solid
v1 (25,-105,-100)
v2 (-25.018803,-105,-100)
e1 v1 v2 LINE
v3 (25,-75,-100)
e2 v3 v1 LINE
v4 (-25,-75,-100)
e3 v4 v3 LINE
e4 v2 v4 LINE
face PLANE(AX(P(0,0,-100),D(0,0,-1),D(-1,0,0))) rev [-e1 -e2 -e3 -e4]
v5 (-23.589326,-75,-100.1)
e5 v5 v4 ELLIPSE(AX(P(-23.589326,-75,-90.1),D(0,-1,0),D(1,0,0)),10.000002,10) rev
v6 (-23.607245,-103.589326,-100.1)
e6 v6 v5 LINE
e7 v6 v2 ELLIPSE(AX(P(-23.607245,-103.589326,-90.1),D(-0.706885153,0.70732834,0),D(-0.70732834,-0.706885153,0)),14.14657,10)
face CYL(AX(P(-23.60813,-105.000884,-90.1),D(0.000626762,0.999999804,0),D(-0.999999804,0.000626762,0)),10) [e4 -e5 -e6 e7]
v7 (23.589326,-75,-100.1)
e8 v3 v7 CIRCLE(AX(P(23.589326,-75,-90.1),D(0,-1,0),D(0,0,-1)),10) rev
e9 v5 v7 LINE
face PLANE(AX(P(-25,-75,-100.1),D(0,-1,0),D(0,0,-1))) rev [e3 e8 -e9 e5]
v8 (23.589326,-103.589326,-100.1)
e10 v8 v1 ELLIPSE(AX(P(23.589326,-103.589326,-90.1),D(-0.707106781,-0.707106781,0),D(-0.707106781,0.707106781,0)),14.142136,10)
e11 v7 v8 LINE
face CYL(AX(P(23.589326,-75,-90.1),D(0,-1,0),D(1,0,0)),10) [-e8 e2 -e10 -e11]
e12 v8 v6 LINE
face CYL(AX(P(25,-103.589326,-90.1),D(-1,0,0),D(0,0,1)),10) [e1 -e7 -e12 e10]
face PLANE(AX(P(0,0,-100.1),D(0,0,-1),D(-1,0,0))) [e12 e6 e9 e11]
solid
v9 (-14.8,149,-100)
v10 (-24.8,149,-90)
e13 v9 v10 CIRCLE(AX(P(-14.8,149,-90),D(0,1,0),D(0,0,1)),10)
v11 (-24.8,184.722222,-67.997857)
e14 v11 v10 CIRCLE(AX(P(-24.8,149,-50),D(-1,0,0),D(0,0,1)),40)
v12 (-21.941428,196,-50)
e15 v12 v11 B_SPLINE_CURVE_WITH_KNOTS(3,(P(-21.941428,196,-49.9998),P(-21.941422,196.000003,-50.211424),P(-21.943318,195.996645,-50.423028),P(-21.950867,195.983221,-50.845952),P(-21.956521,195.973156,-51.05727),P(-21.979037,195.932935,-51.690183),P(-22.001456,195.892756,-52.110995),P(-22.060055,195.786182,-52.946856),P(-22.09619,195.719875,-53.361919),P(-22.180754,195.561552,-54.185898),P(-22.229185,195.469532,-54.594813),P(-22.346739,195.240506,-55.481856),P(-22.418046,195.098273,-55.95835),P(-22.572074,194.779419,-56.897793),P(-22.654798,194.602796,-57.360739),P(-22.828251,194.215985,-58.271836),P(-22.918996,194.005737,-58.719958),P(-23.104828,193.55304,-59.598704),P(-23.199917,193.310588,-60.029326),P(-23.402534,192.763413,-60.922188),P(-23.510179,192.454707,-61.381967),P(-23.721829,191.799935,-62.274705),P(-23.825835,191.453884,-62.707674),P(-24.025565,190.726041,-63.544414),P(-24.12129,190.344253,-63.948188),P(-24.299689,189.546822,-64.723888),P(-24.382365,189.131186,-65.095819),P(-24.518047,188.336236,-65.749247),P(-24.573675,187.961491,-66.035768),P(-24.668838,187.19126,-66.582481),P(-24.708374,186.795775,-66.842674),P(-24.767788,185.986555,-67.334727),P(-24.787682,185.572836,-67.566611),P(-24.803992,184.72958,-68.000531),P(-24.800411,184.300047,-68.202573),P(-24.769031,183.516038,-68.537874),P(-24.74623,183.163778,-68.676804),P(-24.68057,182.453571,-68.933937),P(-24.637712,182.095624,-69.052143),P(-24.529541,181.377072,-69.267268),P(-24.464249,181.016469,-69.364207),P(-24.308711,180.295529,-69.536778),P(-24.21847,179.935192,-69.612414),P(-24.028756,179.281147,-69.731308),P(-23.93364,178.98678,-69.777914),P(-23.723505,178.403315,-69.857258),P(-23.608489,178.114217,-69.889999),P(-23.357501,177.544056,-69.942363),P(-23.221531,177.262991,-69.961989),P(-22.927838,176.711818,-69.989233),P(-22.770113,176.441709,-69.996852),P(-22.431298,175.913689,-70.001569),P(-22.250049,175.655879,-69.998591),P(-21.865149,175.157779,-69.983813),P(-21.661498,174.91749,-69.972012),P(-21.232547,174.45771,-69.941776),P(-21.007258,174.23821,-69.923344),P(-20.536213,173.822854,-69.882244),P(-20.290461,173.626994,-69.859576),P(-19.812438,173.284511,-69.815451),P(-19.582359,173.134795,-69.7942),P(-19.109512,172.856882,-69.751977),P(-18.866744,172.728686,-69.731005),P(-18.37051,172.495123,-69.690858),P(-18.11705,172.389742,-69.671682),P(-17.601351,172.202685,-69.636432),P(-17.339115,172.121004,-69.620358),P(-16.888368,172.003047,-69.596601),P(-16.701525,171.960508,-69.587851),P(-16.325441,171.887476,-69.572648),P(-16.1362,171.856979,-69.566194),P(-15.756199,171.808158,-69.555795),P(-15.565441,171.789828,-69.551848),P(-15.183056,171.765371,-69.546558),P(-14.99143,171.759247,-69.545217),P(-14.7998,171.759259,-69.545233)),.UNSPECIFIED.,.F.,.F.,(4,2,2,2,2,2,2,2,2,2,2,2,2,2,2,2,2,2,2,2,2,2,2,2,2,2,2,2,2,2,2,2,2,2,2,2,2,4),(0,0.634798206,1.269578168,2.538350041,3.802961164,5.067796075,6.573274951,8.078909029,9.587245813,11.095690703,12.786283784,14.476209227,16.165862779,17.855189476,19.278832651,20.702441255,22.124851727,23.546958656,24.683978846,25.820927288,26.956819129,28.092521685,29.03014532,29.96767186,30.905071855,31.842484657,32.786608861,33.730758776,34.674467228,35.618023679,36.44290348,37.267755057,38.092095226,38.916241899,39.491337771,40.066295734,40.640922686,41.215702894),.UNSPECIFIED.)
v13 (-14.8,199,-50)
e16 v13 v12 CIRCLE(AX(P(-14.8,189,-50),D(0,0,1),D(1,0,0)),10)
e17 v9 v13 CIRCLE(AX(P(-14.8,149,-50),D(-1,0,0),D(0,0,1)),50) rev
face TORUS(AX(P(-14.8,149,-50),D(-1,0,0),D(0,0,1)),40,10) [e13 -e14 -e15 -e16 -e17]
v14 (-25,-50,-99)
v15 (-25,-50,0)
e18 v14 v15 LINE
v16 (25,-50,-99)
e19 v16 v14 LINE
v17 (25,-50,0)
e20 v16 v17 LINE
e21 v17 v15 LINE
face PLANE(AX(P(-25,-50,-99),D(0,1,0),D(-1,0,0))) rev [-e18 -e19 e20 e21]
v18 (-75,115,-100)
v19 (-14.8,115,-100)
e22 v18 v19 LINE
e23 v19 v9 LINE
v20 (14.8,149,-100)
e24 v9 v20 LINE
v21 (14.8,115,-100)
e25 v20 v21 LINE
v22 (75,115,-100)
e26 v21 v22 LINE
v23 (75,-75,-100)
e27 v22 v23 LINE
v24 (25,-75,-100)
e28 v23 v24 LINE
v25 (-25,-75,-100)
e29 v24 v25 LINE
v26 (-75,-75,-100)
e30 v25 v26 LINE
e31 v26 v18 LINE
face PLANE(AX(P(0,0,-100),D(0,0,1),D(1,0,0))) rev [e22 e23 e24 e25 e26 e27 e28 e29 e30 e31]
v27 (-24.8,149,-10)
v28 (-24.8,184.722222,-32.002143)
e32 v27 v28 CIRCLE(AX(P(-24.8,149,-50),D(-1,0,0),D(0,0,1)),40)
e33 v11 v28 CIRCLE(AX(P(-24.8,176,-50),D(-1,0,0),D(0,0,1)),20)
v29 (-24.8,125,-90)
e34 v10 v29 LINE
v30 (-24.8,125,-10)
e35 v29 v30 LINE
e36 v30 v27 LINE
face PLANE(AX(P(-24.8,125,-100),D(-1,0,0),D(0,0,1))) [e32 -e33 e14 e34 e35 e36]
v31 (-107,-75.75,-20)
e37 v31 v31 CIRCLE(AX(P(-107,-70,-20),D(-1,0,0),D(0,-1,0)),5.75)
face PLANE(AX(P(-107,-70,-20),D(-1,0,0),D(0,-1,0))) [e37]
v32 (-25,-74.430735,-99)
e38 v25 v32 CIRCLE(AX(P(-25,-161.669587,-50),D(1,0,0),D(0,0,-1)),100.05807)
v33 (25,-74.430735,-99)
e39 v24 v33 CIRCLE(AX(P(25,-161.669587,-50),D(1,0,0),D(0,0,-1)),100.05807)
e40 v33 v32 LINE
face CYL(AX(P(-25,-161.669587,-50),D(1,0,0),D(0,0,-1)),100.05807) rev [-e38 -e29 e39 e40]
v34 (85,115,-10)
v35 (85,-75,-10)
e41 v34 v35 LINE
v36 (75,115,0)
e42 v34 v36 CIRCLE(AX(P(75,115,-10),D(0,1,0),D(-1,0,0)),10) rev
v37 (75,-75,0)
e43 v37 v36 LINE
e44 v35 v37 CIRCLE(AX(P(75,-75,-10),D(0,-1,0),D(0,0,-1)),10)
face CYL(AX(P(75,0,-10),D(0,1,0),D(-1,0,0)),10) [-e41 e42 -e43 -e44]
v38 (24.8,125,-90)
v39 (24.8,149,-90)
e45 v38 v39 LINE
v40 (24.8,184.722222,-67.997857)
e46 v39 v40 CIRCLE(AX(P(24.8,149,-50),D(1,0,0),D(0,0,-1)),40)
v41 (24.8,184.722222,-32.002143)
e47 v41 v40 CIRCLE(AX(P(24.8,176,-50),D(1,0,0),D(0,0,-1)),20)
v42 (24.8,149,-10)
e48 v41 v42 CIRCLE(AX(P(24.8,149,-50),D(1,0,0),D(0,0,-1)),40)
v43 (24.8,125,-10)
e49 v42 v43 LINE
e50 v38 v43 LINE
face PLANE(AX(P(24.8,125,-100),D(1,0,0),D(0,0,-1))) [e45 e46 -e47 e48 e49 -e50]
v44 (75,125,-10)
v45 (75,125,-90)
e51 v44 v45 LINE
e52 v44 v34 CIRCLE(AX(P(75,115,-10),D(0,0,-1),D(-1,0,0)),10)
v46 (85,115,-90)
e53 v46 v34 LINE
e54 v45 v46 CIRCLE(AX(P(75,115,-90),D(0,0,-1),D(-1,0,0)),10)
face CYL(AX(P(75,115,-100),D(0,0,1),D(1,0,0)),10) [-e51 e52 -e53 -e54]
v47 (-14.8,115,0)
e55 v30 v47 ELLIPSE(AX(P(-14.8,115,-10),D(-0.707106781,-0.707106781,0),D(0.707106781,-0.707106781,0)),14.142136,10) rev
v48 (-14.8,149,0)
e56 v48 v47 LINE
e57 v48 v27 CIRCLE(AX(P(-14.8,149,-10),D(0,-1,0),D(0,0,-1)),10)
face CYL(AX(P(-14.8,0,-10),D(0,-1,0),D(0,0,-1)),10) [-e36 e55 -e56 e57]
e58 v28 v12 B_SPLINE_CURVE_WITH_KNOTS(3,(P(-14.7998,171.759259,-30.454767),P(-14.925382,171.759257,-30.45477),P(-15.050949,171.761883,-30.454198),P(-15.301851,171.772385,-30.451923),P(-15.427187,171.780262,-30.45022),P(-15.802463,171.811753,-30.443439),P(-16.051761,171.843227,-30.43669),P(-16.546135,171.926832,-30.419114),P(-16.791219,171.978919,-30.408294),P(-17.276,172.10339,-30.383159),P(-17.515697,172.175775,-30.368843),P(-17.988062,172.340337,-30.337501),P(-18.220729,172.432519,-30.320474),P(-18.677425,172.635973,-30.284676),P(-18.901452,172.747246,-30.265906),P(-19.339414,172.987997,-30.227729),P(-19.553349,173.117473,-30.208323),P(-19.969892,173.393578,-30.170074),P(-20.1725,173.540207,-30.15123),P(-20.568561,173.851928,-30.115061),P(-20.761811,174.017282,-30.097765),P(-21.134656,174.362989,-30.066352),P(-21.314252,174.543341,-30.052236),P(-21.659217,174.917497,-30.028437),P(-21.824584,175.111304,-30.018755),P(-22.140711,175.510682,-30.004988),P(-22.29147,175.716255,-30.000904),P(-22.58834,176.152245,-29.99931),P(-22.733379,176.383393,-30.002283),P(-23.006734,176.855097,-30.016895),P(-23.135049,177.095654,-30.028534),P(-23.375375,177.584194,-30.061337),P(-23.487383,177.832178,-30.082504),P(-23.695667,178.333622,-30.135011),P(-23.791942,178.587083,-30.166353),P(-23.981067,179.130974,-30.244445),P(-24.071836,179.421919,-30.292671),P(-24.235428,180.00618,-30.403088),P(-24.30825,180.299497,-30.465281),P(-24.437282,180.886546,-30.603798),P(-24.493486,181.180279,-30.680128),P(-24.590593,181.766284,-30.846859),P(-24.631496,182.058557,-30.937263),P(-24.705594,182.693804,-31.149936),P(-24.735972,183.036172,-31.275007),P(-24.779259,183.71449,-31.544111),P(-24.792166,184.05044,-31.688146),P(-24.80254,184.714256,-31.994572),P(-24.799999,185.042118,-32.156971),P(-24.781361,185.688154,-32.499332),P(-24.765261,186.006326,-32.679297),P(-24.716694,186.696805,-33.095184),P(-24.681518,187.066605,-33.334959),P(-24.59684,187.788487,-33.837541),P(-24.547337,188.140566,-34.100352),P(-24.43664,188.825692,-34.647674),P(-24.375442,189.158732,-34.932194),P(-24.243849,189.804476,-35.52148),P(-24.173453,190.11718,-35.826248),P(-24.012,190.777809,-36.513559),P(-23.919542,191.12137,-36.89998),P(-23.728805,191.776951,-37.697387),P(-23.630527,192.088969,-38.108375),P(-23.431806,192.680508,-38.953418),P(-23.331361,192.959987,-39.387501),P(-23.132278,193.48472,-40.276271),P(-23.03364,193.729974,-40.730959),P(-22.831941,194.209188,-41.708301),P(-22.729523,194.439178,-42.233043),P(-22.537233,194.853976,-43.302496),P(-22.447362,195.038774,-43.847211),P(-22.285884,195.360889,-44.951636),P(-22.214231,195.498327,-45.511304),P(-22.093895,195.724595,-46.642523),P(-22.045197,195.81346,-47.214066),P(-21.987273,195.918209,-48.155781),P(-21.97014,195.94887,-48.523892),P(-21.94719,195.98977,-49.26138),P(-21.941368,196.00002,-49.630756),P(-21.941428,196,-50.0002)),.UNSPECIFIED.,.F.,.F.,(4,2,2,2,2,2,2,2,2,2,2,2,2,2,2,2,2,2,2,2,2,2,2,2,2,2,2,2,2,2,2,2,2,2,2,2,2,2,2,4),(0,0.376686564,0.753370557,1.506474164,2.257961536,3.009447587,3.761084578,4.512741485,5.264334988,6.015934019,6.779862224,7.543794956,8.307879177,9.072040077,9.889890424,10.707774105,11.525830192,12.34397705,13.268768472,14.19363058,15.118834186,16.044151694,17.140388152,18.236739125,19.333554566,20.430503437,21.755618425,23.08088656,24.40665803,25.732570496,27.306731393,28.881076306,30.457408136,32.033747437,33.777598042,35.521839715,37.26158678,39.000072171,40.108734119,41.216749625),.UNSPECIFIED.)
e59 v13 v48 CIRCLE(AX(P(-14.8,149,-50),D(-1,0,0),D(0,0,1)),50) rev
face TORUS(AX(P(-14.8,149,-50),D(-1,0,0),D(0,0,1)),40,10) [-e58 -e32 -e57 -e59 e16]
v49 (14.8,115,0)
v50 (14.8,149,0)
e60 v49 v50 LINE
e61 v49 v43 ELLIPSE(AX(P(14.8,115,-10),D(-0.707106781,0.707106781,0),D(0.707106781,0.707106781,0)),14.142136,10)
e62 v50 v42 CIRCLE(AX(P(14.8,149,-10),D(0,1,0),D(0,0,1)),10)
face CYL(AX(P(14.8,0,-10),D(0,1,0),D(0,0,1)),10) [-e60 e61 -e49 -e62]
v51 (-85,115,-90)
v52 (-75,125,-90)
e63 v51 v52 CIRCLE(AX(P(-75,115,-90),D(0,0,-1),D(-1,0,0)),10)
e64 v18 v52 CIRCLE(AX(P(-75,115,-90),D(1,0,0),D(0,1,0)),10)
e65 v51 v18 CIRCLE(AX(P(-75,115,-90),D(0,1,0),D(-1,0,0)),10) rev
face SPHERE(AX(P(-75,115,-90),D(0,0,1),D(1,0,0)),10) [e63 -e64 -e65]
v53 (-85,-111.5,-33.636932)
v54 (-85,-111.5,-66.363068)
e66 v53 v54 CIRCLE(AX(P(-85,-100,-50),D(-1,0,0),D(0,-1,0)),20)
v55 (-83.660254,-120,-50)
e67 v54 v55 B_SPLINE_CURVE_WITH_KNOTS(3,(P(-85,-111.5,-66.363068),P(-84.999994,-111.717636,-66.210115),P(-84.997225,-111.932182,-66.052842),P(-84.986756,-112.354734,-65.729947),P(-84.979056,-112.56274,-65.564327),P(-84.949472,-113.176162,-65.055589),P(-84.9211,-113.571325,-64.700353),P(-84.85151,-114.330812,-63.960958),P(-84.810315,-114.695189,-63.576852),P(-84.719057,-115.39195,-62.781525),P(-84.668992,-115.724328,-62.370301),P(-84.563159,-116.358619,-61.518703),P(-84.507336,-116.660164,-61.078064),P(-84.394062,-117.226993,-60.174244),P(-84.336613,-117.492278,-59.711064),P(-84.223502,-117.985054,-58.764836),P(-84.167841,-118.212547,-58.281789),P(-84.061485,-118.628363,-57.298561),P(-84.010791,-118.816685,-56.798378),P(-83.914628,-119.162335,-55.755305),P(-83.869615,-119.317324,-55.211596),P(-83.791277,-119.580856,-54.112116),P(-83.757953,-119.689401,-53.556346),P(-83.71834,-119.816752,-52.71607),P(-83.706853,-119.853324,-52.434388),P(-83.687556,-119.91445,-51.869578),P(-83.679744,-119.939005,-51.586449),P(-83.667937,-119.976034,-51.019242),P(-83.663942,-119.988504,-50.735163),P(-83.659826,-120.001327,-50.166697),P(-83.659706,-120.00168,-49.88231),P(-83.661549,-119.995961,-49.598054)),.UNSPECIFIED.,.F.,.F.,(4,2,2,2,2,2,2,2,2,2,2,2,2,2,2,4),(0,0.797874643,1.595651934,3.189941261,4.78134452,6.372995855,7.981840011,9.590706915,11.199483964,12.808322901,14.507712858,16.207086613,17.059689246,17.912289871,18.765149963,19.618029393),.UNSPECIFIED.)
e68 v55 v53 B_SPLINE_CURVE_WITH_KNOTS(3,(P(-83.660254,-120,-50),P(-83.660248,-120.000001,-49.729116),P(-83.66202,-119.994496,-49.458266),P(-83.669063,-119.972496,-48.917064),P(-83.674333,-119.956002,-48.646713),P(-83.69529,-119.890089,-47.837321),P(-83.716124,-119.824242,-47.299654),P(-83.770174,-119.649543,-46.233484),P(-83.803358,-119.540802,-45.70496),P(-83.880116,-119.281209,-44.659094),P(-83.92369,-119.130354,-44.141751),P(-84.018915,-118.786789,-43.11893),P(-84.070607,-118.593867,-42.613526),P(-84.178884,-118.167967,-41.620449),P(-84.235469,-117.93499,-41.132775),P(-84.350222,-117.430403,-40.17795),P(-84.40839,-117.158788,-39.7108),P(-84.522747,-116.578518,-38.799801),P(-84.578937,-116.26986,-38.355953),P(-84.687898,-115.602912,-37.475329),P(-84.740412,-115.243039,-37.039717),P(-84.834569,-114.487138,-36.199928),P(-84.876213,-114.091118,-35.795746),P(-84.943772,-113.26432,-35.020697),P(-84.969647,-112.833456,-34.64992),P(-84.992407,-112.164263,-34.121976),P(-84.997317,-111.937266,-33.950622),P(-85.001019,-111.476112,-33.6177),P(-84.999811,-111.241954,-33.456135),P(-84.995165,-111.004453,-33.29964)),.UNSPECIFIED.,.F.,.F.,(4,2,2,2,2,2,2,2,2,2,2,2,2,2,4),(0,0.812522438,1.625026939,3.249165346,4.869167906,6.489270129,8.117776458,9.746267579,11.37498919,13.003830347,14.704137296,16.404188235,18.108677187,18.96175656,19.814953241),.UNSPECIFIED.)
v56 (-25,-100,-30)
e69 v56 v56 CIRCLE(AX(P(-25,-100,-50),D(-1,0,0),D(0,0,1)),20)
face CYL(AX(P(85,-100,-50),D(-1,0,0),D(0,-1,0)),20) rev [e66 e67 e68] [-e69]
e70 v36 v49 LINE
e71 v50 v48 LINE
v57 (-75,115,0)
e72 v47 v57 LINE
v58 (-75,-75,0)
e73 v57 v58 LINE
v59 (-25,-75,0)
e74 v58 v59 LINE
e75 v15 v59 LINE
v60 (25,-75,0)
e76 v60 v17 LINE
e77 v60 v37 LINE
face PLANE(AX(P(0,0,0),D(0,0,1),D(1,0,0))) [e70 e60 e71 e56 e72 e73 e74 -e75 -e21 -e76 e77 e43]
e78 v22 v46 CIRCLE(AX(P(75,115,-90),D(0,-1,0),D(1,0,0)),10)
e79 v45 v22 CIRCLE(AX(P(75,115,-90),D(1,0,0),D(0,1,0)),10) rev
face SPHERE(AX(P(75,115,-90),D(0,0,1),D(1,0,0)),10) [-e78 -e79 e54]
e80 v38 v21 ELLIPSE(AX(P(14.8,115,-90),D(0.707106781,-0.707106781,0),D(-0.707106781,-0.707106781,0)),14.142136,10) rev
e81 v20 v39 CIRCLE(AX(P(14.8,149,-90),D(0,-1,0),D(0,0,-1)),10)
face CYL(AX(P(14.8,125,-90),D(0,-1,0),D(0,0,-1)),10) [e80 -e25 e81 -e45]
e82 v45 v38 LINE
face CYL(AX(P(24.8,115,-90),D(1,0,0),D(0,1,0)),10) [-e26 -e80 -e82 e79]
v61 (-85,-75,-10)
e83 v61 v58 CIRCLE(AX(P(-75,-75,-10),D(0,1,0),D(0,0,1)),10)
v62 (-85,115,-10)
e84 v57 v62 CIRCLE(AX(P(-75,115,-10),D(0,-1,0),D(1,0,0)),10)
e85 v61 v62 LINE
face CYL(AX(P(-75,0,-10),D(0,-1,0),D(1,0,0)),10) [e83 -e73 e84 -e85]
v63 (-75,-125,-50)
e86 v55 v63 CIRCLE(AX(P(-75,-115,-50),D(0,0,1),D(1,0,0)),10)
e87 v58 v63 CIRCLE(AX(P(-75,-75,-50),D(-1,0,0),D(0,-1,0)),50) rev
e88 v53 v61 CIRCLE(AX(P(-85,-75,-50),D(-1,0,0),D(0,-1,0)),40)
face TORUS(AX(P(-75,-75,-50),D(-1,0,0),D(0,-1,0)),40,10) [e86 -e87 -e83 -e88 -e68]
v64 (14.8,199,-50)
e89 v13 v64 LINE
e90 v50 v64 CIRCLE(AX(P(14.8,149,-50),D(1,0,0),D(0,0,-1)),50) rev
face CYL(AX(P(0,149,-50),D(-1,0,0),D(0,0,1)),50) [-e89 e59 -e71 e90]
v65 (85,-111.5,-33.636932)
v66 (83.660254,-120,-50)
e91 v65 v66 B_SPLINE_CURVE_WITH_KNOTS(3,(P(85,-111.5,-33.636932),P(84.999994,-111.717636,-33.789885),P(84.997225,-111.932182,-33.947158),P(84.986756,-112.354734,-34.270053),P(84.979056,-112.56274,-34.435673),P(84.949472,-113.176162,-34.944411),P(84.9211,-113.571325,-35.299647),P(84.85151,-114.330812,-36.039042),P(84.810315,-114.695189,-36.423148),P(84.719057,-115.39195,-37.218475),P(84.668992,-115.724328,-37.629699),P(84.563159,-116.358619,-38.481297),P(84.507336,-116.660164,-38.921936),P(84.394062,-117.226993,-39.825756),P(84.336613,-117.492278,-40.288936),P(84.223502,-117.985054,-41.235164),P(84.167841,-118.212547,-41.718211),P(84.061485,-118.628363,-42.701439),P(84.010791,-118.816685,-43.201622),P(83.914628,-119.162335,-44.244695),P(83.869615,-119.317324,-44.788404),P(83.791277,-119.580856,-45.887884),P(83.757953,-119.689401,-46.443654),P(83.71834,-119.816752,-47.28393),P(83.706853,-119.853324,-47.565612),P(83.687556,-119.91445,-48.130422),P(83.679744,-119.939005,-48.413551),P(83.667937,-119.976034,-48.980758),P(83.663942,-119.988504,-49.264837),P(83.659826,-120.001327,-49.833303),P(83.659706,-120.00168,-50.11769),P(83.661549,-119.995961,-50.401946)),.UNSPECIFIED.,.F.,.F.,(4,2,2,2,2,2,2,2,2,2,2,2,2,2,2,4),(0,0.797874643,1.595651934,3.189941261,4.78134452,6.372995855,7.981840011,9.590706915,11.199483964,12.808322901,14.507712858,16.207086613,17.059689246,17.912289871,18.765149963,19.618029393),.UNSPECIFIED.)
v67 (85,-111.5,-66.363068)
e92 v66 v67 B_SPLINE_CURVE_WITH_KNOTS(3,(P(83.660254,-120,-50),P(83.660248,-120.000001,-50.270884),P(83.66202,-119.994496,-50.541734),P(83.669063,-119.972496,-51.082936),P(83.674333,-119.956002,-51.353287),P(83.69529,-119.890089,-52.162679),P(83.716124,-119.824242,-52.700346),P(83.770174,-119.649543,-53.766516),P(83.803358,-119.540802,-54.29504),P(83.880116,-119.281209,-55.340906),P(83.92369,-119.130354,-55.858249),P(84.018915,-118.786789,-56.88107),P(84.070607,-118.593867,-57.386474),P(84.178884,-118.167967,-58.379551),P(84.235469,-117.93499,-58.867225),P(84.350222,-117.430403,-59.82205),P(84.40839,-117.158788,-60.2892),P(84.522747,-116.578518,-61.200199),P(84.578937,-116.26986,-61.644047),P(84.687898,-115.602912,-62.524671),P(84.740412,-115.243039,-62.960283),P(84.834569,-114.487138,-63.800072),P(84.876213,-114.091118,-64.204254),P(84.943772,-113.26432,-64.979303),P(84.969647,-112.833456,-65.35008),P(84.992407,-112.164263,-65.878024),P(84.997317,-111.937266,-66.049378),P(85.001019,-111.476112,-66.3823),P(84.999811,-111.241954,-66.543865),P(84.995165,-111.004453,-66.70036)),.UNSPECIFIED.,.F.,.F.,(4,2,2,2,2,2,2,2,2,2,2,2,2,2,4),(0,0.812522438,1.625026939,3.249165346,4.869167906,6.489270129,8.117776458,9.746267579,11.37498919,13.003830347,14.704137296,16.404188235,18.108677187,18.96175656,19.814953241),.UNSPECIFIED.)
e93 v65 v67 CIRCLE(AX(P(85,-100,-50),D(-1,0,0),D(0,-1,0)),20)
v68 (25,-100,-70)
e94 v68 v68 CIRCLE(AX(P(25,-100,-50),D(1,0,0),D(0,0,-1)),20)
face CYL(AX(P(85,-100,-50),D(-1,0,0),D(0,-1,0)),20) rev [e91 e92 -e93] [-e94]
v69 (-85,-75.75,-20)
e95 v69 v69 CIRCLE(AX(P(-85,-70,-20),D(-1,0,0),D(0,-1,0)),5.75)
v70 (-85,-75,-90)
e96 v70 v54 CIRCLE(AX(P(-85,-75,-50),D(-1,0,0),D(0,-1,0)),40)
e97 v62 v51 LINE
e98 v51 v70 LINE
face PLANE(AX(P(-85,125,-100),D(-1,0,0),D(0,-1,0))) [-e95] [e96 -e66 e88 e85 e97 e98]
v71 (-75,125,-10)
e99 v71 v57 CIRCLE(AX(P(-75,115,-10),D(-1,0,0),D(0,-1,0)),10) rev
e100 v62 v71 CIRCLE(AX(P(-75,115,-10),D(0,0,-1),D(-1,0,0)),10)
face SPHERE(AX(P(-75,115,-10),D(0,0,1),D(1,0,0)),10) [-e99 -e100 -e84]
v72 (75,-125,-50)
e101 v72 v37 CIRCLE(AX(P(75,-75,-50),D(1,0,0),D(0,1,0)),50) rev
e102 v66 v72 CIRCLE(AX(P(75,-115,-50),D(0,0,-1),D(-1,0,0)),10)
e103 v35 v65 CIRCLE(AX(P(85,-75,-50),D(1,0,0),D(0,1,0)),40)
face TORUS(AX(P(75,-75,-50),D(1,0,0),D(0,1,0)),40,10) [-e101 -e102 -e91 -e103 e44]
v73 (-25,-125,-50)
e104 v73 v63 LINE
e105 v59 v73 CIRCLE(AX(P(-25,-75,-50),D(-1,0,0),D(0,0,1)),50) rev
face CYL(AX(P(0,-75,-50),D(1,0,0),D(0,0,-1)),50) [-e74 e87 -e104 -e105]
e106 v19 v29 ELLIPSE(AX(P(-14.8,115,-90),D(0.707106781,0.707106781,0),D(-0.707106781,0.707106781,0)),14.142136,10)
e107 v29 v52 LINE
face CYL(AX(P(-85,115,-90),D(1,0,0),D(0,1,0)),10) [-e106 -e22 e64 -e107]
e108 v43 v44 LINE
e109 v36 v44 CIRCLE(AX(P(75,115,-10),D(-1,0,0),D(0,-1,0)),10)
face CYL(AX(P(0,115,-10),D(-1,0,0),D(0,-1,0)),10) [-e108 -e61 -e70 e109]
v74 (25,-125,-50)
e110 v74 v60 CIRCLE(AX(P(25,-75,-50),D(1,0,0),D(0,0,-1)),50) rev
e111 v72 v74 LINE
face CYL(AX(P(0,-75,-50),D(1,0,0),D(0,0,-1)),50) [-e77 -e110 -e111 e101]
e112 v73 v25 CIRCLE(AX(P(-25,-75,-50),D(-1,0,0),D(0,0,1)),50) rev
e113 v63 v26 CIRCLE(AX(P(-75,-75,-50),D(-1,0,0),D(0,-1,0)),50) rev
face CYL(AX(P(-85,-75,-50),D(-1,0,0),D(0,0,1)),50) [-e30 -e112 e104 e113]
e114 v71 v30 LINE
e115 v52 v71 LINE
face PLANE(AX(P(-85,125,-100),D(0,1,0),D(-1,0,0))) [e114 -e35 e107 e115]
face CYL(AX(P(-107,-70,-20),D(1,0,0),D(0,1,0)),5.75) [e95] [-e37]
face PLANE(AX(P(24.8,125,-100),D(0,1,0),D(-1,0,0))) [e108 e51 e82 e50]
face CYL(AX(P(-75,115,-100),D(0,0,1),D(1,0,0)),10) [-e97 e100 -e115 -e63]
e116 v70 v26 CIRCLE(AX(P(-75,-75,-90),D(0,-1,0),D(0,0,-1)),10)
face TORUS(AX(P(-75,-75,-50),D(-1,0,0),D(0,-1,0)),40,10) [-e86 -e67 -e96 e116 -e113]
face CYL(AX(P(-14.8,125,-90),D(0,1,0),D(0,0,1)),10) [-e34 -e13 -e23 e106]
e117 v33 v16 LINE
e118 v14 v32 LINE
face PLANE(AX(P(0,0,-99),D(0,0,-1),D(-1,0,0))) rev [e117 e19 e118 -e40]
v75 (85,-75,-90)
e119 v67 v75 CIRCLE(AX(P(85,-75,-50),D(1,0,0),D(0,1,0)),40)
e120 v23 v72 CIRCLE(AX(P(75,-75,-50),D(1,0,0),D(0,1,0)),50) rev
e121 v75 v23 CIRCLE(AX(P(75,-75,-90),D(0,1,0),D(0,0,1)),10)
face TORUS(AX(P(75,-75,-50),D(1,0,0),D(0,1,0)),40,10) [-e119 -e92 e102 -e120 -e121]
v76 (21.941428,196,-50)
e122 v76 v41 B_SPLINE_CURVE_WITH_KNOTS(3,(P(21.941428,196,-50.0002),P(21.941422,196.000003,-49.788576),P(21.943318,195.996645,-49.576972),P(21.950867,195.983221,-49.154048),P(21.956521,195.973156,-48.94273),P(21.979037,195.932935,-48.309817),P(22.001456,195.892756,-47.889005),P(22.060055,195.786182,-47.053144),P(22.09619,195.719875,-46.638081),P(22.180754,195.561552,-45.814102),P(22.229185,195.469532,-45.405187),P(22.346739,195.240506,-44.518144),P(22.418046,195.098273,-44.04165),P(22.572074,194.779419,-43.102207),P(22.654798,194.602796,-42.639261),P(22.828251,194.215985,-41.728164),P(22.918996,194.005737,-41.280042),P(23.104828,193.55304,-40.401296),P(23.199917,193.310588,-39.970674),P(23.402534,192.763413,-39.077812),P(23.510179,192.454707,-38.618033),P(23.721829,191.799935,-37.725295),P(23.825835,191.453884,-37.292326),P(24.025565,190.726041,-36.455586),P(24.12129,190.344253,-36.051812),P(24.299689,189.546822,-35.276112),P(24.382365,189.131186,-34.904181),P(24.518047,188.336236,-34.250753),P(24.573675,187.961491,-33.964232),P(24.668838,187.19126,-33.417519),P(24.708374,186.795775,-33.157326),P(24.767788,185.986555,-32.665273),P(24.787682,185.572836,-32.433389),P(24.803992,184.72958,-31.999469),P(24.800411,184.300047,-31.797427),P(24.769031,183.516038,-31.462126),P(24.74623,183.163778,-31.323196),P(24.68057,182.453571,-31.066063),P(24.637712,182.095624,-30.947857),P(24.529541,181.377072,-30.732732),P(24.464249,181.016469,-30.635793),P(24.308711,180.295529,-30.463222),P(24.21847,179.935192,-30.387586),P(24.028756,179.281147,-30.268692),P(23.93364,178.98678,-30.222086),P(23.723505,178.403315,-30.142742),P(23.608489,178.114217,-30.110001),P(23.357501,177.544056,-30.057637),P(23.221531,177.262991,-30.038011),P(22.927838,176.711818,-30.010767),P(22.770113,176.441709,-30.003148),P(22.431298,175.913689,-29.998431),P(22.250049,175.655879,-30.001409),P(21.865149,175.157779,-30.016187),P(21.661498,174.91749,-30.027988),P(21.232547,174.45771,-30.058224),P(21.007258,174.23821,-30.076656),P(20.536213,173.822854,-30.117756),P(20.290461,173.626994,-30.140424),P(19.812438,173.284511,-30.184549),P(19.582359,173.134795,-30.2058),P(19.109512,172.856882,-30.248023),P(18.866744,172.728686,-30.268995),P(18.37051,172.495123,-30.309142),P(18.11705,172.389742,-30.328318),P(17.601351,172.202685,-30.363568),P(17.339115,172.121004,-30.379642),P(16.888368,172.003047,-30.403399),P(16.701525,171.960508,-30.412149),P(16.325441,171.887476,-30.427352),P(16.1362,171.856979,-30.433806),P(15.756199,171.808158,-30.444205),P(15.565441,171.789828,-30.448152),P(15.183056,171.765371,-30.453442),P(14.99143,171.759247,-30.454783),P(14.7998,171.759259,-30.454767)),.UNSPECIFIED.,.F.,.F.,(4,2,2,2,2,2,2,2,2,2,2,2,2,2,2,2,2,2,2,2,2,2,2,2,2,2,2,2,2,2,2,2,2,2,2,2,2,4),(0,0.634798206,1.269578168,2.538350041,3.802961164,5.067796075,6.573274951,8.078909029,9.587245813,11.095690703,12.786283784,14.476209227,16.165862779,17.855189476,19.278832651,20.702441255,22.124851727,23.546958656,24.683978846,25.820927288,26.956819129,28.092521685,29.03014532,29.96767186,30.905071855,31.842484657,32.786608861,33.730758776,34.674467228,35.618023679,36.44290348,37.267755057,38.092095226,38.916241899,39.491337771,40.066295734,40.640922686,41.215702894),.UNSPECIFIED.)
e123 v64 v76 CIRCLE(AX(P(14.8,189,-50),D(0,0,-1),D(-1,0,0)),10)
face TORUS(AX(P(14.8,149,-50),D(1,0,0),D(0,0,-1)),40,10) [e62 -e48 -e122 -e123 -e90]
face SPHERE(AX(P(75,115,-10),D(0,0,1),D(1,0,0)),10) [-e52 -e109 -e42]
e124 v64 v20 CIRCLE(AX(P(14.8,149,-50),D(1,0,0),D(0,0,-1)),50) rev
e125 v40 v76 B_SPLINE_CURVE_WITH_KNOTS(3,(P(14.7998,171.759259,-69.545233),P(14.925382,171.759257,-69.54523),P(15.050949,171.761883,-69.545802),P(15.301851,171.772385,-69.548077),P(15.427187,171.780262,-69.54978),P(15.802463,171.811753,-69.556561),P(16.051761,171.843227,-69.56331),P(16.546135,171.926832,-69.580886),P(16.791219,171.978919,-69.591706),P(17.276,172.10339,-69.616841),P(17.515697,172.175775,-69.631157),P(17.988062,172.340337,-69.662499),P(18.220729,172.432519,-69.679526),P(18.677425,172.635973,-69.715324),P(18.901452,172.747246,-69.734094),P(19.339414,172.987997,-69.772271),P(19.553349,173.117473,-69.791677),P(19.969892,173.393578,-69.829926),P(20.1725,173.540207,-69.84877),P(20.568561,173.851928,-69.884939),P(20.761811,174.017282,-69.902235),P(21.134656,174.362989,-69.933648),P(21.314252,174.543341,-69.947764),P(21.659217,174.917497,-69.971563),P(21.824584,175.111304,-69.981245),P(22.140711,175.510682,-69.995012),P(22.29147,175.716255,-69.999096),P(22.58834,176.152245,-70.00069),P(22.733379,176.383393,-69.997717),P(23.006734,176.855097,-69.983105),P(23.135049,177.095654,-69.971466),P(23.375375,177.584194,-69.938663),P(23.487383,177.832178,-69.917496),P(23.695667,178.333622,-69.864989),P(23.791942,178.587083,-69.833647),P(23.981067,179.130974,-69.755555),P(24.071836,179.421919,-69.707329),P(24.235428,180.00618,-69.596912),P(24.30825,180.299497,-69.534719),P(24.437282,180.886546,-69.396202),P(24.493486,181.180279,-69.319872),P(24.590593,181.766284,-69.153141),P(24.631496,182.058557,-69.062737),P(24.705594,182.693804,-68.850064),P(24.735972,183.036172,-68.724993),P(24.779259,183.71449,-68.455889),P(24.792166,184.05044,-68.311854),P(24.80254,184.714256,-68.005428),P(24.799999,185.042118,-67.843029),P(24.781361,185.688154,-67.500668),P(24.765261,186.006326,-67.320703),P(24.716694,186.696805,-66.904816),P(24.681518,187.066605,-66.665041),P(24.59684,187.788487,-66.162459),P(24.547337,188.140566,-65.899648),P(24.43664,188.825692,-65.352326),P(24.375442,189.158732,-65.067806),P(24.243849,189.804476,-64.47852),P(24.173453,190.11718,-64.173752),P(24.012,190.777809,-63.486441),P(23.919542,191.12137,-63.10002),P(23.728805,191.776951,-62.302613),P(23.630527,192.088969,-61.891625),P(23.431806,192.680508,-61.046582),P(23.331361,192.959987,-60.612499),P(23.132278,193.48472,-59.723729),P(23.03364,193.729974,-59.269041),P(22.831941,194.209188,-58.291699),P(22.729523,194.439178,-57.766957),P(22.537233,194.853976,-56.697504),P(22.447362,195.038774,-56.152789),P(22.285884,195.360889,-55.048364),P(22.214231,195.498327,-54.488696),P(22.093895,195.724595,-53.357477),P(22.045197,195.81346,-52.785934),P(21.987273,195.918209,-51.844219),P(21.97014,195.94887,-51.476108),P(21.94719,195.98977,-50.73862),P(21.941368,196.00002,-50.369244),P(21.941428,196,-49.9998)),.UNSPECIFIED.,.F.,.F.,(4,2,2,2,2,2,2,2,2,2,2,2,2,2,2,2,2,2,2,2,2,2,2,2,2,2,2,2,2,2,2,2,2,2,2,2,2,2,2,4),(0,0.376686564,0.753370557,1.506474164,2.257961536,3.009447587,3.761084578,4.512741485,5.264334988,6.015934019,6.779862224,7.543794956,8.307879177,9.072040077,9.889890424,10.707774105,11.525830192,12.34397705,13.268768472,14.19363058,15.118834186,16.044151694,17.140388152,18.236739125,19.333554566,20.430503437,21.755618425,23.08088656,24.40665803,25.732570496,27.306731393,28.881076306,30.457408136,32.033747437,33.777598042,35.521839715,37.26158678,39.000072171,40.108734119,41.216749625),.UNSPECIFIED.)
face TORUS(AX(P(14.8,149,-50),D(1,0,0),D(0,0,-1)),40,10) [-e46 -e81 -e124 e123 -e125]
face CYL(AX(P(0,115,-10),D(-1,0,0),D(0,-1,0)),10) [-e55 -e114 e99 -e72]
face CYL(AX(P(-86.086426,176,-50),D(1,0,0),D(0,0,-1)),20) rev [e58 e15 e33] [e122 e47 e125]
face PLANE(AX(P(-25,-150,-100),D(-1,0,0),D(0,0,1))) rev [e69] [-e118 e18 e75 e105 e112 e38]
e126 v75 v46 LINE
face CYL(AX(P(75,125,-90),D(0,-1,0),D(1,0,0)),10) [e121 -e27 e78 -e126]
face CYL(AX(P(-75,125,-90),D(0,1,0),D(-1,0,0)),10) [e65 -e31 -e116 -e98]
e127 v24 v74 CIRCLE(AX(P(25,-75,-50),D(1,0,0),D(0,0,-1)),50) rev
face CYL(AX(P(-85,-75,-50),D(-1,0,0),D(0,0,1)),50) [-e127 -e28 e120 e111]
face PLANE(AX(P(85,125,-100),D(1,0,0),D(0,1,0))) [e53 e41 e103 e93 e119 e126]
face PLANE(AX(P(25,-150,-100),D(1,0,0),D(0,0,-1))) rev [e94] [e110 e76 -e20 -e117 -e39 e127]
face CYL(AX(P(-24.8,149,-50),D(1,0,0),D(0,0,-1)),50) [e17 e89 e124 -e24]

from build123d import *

# Parameters (mm, degrees)
BOSS_EXTRUDE1_DEPTH    = 100
SKETCH2_W              = 50
SKETCH2_H              = 50
CUT_EXTRUDE1_DEPTH     = 239.382046304
FILLET1_R              = 50
CUT_EXTRUDE2_DEPTH     = 25
SKETCH7_R              = 20
CUT_EXTRUDE3_DEPTH     = 281.180299093
FILLET2_R              = 50
CUT_EXTRUDE6_START     = -125
CUT_EXTRUDE6_OUTLINE_W = 50
CUT_EXTRUDE6_OUTLINE_H = 6.698729811
CUT_EXTRUDE6_DEPTH     = 50
CUT_EXTRUDE7_DEPTH     = 25
FILLET3_R              = 10
SKETCH11_W             = 50
SKETCH11_H             = 25
CUT_EXTRUDE8_DEPTH     = 99
BOSS_EXTRUDE7_DEPTH    = 0.1
FILLET4_R              = 10
FILLET5_R              = 10
SKETCH8_R              = 20
CUT_EXTRUDE9_DEPTH     = 249.348646185
SKETCH14_R             = 5.75
BOSS_EXTRUDE8_DEPTH    = 22


with BuildPart() as part:
    # Sketch1 → Boss-Extrude1 (new body)
    with BuildSketch(Plane.XY):
        Polygon((-24.8, 125), (-24.8, 199), (24.8, 199), (24.8, 125), (85, 125), (85, -125), (-85, -125), (-85, 125), align=None)
    extrude(amount=-BOSS_EXTRUDE1_DEPTH)

    # Sketch2 → Cut-Extrude1 (cut, through all)
    with BuildSketch(Plane.XY):
        with Locations((0, -125)):
            Rectangle(SKETCH2_W, SKETCH2_H)
    extrude(amount=-CUT_EXTRUDE1_DEPTH, mode=Mode.SUBTRACT)

    # Fillet1
    fillet1_edges = [part.edges().sort_by_distance(p)[0] for p in [
        (0, 199, -100),
        (0, 199, 0),
    ]]
    fillet(fillet1_edges, radius=FILLET1_R - 0.0001)  # a hair under: the kernel refuses the full size

    # Sketch6 → Cut-Extrude2 (cut, symmetric)
    with BuildSketch(Plane(origin=(0, 0, 0), x_dir=(0, 0, -1), z_dir=(1, 0, 0))):
        with BuildLine():
            Line((100, -100), (0, -100))
            ThreePointArc((0, -100), (50, -50), (100, -100))
        make_face()
    extrude(amount=CUT_EXTRUDE2_DEPTH, both=True, mode=Mode.SUBTRACT)

    # Sketch7 → Cut-Extrude3 (cut, through all)
    with BuildSketch(Plane.ZY.offset(85)):
        with Locations(Location((-50, -100, 0), (0, 0, 270))):
            Circle(SKETCH7_R)
    extrude(amount=-CUT_EXTRUDE3_DEPTH, mode=Mode.SUBTRACT)

    # Fillet2
    fillet2_edges = [part.edges().sort_by_distance(p)[0] for p in [
        (-55, -125, -100),
        (-55, -125, 0),
    ]]
    fillet(fillet2_edges, radius=FILLET2_R - 0.0001)  # a hair under: the kernel refuses the full size

    # Cut-Extrude6: read off the stored shape, not the designer's step
    # Cut-Extrude6 outline → Cut-Extrude6 (cut)
    with BuildSketch(Plane(origin=(0, 0, 0), x_dir=(1, 0, 0), z_dir=(0, 1, 0)).offset(CUT_EXTRUDE6_START)):
        with Locations((0, 96.650635095)):
            Rectangle(CUT_EXTRUDE6_OUTLINE_W, CUT_EXTRUDE6_OUTLINE_H)
        with Locations((0, 3.349364906)):
            Rectangle(CUT_EXTRUDE6_OUTLINE_W, CUT_EXTRUDE6_OUTLINE_H)
    extrude(amount=CUT_EXTRUDE6_DEPTH, mode=Mode.SUBTRACT)

    # Sketch10 → Cut-Extrude7 (cut, symmetric)
    with BuildSketch(Plane(origin=(0, 0, 0), x_dir=(0, 0, -1), z_dir=(1, 0, 0))):
        with BuildLine():
            Line((0, -75), (100, -75))
            ThreePointArc((100, -75), (50, -61.611517322), (0, -75))
        make_face()
    extrude(amount=CUT_EXTRUDE7_DEPTH, both=True, mode=Mode.SUBTRACT)

    # Fillet3
    # the kernel refuses this fillet: 10 mm, written as the material it takes off along each edge
    with BuildSketch(Plane(origin=(24.8, 149.0001, -100), x_dir=(0, 0, 1), z_dir=(0, -1, 0)), Plane(origin=(-24.8, 125, 0), x_dir=(1, 0, 0), z_dir=(0, 1, 0)), Plane(origin=(-24.8, 125, -100), x_dir=(0, 0, 1), z_dir=(0, 1, 0)), Plane(origin=(24.8, 149.0001, 0), x_dir=(-1, 0, 0), z_dir=(0, -1, 0))) as fillet3_piece_1:
        with BuildLine():
            CenterArc((FILLET3_R, FILLET3_R), FILLET3_R, 180, 90)
            Line((0, FILLET3_R), (0, 0))
            Line((0, 0), (FILLET3_R, 0))
        make_face()
    extrude(amount=24.0001, mode=Mode.SUBTRACT)
    with BuildSketch(Plane(origin=(24.8, 125, 0), x_dir=(0, -1, 0), z_dir=(1, 0, 0)), Plane(origin=(-110, 125, -100), x_dir=(0, 0, 1), z_dir=(1, 0, 0)), Plane(origin=(24.8, 125, -100), x_dir=(0, 0, 1), z_dir=(1, 0, 0)), Plane(origin=(-110, 125, 0), x_dir=(0, -1, 0), z_dir=(1, 0, 0))) as fillet3_piece_2:
        with BuildLine():
            CenterArc((FILLET3_R, FILLET3_R), FILLET3_R, 180, 90)
            Line((0, FILLET3_R), (0, 0))
            Line((0, 0), (FILLET3_R, 0))
        make_face()
    extrude(amount=85.2, mode=Mode.SUBTRACT)
    with BuildSketch(Plane(origin=(-85, -75.0001, -100), x_dir=(0, 0, 1), z_dir=(0, 1, 0)), Plane(origin=(85, 150, 0), x_dir=(-1, 0, 0), z_dir=(0, -1, 0)), Plane(origin=(85, 150, -100), x_dir=(0, 0, 1), z_dir=(0, -1, 0)), Plane(origin=(-85, -75.0001, 0), x_dir=(1, 0, 0), z_dir=(0, 1, 0))) as fillet3_piece_3:
        with BuildLine():
            CenterArc((FILLET3_R, FILLET3_R), FILLET3_R, 180, 90)
            Line((0, FILLET3_R), (0, 0))
            Line((0, 0), (FILLET3_R, 0))
        make_face()
    extrude(amount=225.0001, mode=Mode.SUBTRACT)
    with BuildSketch(Plane(origin=(-24.8, 149.0001, -49.9999), x_dir=(0, 1, 0), z_dir=(0, 0, -1))) as fillet3_piece_4:
        with BuildLine():
            CenterArc((49.9999 - FILLET3_R, FILLET3_R), FILLET3_R, 270, 90)
            Line((49.9999 - FILLET3_R, 0), (49.9999, 0))
            Line((49.9999, 0), (49.9999, FILLET3_R))
        make_face()
    revolve(axis=Axis((-24.8, 149.0001, -49.9999), (1, 0, 0)), revolution_arc=90, mode=Mode.SUBTRACT)
    with BuildSketch(Plane(origin=(-24.8, 149.0001, -50.0001), x_dir=(0, 1, 0), z_dir=(0, 0, 1))) as fillet3_piece_5:
        with BuildLine():
            CenterArc((49.9999 - FILLET3_R, -FILLET3_R), FILLET3_R, 0, 90)
            Line((49.9999, -FILLET3_R), (49.9999, 0))
            Line((49.9999, 0), (49.9999 - FILLET3_R, 0))
        make_face()
    revolve(axis=Axis((-24.8, 149.0001, -50.0001), (-1, 0, 0)), revolution_arc=90, mode=Mode.SUBTRACT)
    with BuildSketch(Plane(origin=(24.8, 149.0001, -49.9999), x_dir=(0, 1, 0), z_dir=(0, 0, -1))) as fillet3_piece_6:
        with BuildLine():
            CenterArc((49.9999 - FILLET3_R, -FILLET3_R), FILLET3_R, 0, 90)
            Line((49.9999, -FILLET3_R), (49.9999, 0))
            Line((49.9999, 0), (49.9999 - FILLET3_R, 0))
        make_face()
    revolve(axis=Axis((24.8, 149.0001, -49.9999), (1, 0, 0)), revolution_arc=90, mode=Mode.SUBTRACT)
    with BuildSketch(Plane(origin=(24.8, 149.0001, -50.0001), x_dir=(0, 1, 0), z_dir=(0, 0, 1))) as fillet3_piece_7:
        with BuildLine():
            CenterArc((49.9999 - FILLET3_R, FILLET3_R), FILLET3_R, 270, 90)
            Line((49.9999, FILLET3_R), (49.9999, 0))
            Line((49.9999, 0), (49.9999 - FILLET3_R, 0))
        make_face()
    revolve(axis=Axis((24.8, 149.0001, -50.0001), (-1, 0, 0)), revolution_arc=90, mode=Mode.SUBTRACT)
    with BuildSketch(Plane(origin=(85, -75.0001, -49.9999), x_dir=(0, 0, 1), z_dir=(0, 1, 0))) as fillet3_piece_8:
        with BuildLine():
            CenterArc((49.9999 - FILLET3_R, -FILLET3_R), FILLET3_R, 0, 90)
            Line((49.9999, -FILLET3_R), (49.9999, 0))
            Line((49.9999, 0), (49.9999 - FILLET3_R, 0))
        make_face()
    revolve(axis=Axis((85, -75.0001, -49.9999), (1, 0, 0)), revolution_arc=90, mode=Mode.SUBTRACT)
    with BuildSketch(Plane(origin=(85, -75.0001, -50.0001), x_dir=(0, 0, -1), z_dir=(0, 1, 0))) as fillet3_piece_9:
        with BuildLine():
            CenterArc((49.9999 - FILLET3_R, FILLET3_R), FILLET3_R, 270, 90)
            Line((49.9999, FILLET3_R), (49.9999, 0))
            Line((49.9999, 0), (49.9999 - FILLET3_R, 0))
        make_face()
    revolve(axis=Axis((85, -75.0001, -50.0001), (-1, 0, 0)), revolution_arc=90, mode=Mode.SUBTRACT)
    with BuildSketch(Plane(origin=(-85, -75.0001, -49.9999), x_dir=(0, 0, 1), z_dir=(0, 1, 0))) as fillet3_piece_10:
        with BuildLine():
            CenterArc((49.9999 - FILLET3_R, FILLET3_R), FILLET3_R, 270, 90)
            Line((49.9999, FILLET3_R), (49.9999, 0))
            Line((49.9999, 0), (49.9999 - FILLET3_R, 0))
        make_face()
    revolve(axis=Axis((-85, -75.0001, -49.9999), (1, 0, 0)), revolution_arc=90, mode=Mode.SUBTRACT)
    with BuildSketch(Plane(origin=(-85, -75.0001, -50.0001), x_dir=(0, 0, -1), z_dir=(0, 1, 0))) as fillet3_piece_11:
        with BuildLine():
            CenterArc((49.9999 - FILLET3_R, -FILLET3_R), FILLET3_R, 0, 90)
            Line((49.9999, -FILLET3_R), (49.9999, 0))
            Line((49.9999, 0), (49.9999 - FILLET3_R, 0))
        make_face()
    revolve(axis=Axis((-85, -75.0001, -50.0001), (-1, 0, 0)), revolution_arc=90, mode=Mode.SUBTRACT)
    with BuildSketch(Plane(origin=(-85, -125, -49.9999), x_dir=(0, 1, 0), z_dir=(0, 0, -1)), Plane(origin=(24.8, 199, -49.9999), x_dir=(0, -1, 0), z_dir=(0, 0, -1))) as fillet3_piece_12:
        with BuildLine():
            CenterArc((FILLET3_R, FILLET3_R), FILLET3_R, 180, 90)
            Line((0, FILLET3_R), (0, 0))
            Line((0, 0), (FILLET3_R, 0))
        make_face()
    extrude(amount=0.0002, mode=Mode.SUBTRACT)
    with BuildSketch(Plane(origin=(85, -125, -49.9999), x_dir=(0, 1, 0), z_dir=(0, 0, -1)), Plane(origin=(-24.8, 199, -49.9999), x_dir=(0, -1, 0), z_dir=(0, 0, -1))) as fillet3_piece_13:
        with BuildLine():
            CenterArc((FILLET3_R, -FILLET3_R), FILLET3_R, 90, 90)
            Line((0, -FILLET3_R), (0, 0))
            Line((0, 0), (FILLET3_R, 0))
        make_face()
    extrude(amount=0.0002, mode=Mode.SUBTRACT)
    with BuildSketch(Plane(origin=(-0.2, 125, -100), x_dir=(0, 0, 1), z_dir=(1, 0, 0))) as fillet3_piece_14a_section:
        with BuildLine():
            CenterArc((FILLET3_R, FILLET3_R), FILLET3_R, 180, 90)
            Line((0, FILLET3_R), (0, 0))
            Line((0, 0), (FILLET3_R, 0))
        make_face()
    fillet3_piece_14a = extrude(amount=110.2, mode=Mode.PRIVATE)
    fillet3_piece_14a = split(fillet3_piece_14a, bisect_by=Plane(origin=(24.8, 125, -100), z_dir=(-1, 0, 0)), keep=Keep.TOP, mode=Mode.PRIVATE)
    with BuildSketch(Plane(origin=(24.8, 149.0001, -100), x_dir=(0, 0, 1), z_dir=(0, -1, 0))) as fillet3_piece_14b_section:
        with BuildLine():
            CenterArc((FILLET3_R, FILLET3_R), FILLET3_R, 180, 90)
            Line((0, FILLET3_R), (0, 0))
            Line((0, 0), (FILLET3_R, 0))
        make_face()
    fillet3_piece_14b = extrude(amount=49.0001, mode=Mode.PRIVATE)
    fillet3_piece_14b = split(fillet3_piece_14b, bisect_by=Plane(origin=(24.8, 125, -100), z_dir=(0, -1, 0)), keep=Keep.TOP, mode=Mode.PRIVATE)
    fillet3_piece_14 = fillet3_piece_14a & fillet3_piece_14b
    add(fillet3_piece_14, mode=Mode.SUBTRACT)
    with BuildSketch(Plane(origin=(-0.2, 125, 0), x_dir=(0, -1, 0), z_dir=(1, 0, 0))) as fillet3_piece_15a_section:
        with BuildLine():
            CenterArc((FILLET3_R, FILLET3_R), FILLET3_R, 180, 90)
            Line((0, FILLET3_R), (0, 0))
            Line((0, 0), (FILLET3_R, 0))
        make_face()
    fillet3_piece_15a = extrude(amount=110.2, mode=Mode.PRIVATE)
    fillet3_piece_15a = split(fillet3_piece_15a, bisect_by=Plane(origin=(24.8, 125, 0), z_dir=(-1, 0, 0)), keep=Keep.TOP, mode=Mode.PRIVATE)
    with BuildSketch(Plane(origin=(24.8, 149.0001, 0), x_dir=(-1, 0, 0), z_dir=(0, -1, 0))) as fillet3_piece_15b_section:
        with BuildLine():
            CenterArc((FILLET3_R, FILLET3_R), FILLET3_R, 180, 90)
            Line((0, FILLET3_R), (0, 0))
            Line((0, 0), (FILLET3_R, 0))
        make_face()
    fillet3_piece_15b = extrude(amount=49.0001, mode=Mode.PRIVATE)
    fillet3_piece_15b = split(fillet3_piece_15b, bisect_by=Plane(origin=(24.8, 125, 0), z_dir=(0, -1, 0)), keep=Keep.TOP, mode=Mode.PRIVATE)
    fillet3_piece_15 = fillet3_piece_15a & fillet3_piece_15b
    add(fillet3_piece_15, mode=Mode.SUBTRACT)
    with BuildSketch(Plane(origin=(-24.8, 100, -100), x_dir=(0, 0, 1), z_dir=(0, 1, 0))) as fillet3_piece_16a_section:
        with BuildLine():
            CenterArc((FILLET3_R, FILLET3_R), FILLET3_R, 180, 90)
            Line((0, FILLET3_R), (0, 0))
            Line((0, 0), (FILLET3_R, 0))
        make_face()
    fillet3_piece_16a = extrude(amount=49.0001, mode=Mode.PRIVATE)
    fillet3_piece_16a = split(fillet3_piece_16a, bisect_by=Plane(origin=(-24.8, 125, -100), z_dir=(0, -1, 0)), keep=Keep.TOP, mode=Mode.PRIVATE)
    with BuildSketch(Plane(origin=(-110, 125, -100), x_dir=(0, 0, 1), z_dir=(1, 0, 0))) as fillet3_piece_16b_section:
        with BuildLine():
            CenterArc((FILLET3_R, FILLET3_R), FILLET3_R, 180, 90)
            Line((0, FILLET3_R), (0, 0))
            Line((0, 0), (FILLET3_R, 0))
        make_face()
    fillet3_piece_16b = extrude(amount=110.2, mode=Mode.PRIVATE)
    fillet3_piece_16b = split(fillet3_piece_16b, bisect_by=Plane(origin=(-24.8, 125, -100), z_dir=(1, 0, 0)), keep=Keep.TOP, mode=Mode.PRIVATE)
    fillet3_piece_16 = fillet3_piece_16a & fillet3_piece_16b
    add(fillet3_piece_16, mode=Mode.SUBTRACT)
    with BuildSketch(Plane(origin=(-24.8, 100, 0), x_dir=(1, 0, 0), z_dir=(0, 1, 0))) as fillet3_piece_17a_section:
        with BuildLine():
            CenterArc((FILLET3_R, FILLET3_R), FILLET3_R, 180, 90)
            Line((0, FILLET3_R), (0, 0))
            Line((0, 0), (FILLET3_R, 0))
        make_face()
    fillet3_piece_17a = extrude(amount=49.0001, mode=Mode.PRIVATE)
    fillet3_piece_17a = split(fillet3_piece_17a, bisect_by=Plane(origin=(-24.8, 125, 0), z_dir=(0, -1, 0)), keep=Keep.TOP, mode=Mode.PRIVATE)
    with BuildSketch(Plane(origin=(-110, 125, 0), x_dir=(0, -1, 0), z_dir=(1, 0, 0))) as fillet3_piece_17b_section:
        with BuildLine():
            CenterArc((FILLET3_R, FILLET3_R), FILLET3_R, 180, 90)
            Line((0, FILLET3_R), (0, 0))
            Line((0, 0), (FILLET3_R, 0))
        make_face()
    fillet3_piece_17b = extrude(amount=110.2, mode=Mode.PRIVATE)
    fillet3_piece_17b = split(fillet3_piece_17b, bisect_by=Plane(origin=(-24.8, 125, 0), z_dir=(1, 0, 0)), keep=Keep.TOP, mode=Mode.PRIVATE)
    fillet3_piece_17 = fillet3_piece_17a & fillet3_piece_17b
    add(fillet3_piece_17, mode=Mode.SUBTRACT)

    # Sketch11 → Cut-Extrude8 (cut)
    with BuildSketch(Plane.XY):
        with Locations((0, -62.5)):
            Rectangle(SKETCH11_W, SKETCH11_H)
    extrude(amount=-CUT_EXTRUDE8_DEPTH, mode=Mode.SUBTRACT)

    # Fillet5
    # the kernel refuses this fillet: 10 mm, written as the material it takes off along each edge
    with BuildSketch(Plane(origin=(75, 115, -10), x_dir=(0, 1, 0), z_dir=(1, 0, 0))) as fillet5_piece_1_section:
        Polygon((0, 0), (FILLET5_R, 0), (FILLET5_R, FILLET5_R), (0, FILLET5_R), align=None)
    fillet5_piece_1 = extrude(amount=FILLET5_R, mode=Mode.PRIVATE)
    fillet5_piece_1 = fillet5_piece_1 - Plane(origin=(75, 115, -10), x_dir=(0, -0.7071067811865475, -0.7071067811865475), z_dir=(1, 0, 0)) * Sphere(FILLET5_R, mode=Mode.PRIVATE)
    add(fillet5_piece_1, mode=Mode.SUBTRACT)
    with BuildSketch(Plane(origin=(75, 115, -90), x_dir=(0, 1, 0), z_dir=(1, 0, 0))) as fillet5_piece_2_section:
        Polygon((0, 0), (FILLET5_R, 0), (FILLET5_R, -FILLET5_R), (0, -FILLET5_R), align=None)
    fillet5_piece_2 = extrude(amount=FILLET5_R, mode=Mode.PRIVATE)
    fillet5_piece_2 = fillet5_piece_2 - Plane(origin=(75, 115, -90), x_dir=(0, -0.7071067811865475, 0.7071067811865475), z_dir=(1, 0, 0)) * Sphere(FILLET5_R, mode=Mode.PRIVATE)
    add(fillet5_piece_2, mode=Mode.SUBTRACT)
    with BuildSketch(Plane(origin=(-75, 115, -90), x_dir=(0, 1, 0), z_dir=(-1, 0, 0))) as fillet5_piece_3_section:
        Polygon((0, 0), (FILLET5_R, 0), (FILLET5_R, FILLET5_R), (0, FILLET5_R), align=None)
    fillet5_piece_3 = extrude(amount=FILLET5_R, mode=Mode.PRIVATE)
    fillet5_piece_3 = fillet5_piece_3 - Plane(origin=(-75, 115, -90), x_dir=(0, -0.7071067811865475, 0.7071067811865475), z_dir=(-1, 0, 0)) * Sphere(FILLET5_R, mode=Mode.PRIVATE)
    add(fillet5_piece_3, mode=Mode.SUBTRACT)
    with BuildSketch(Plane(origin=(-75, 115, -10), x_dir=(0, 1, 0), z_dir=(-1, 0, 0))) as fillet5_piece_4_section:
        Polygon((0, 0), (FILLET5_R, 0), (FILLET5_R, -FILLET5_R), (0, -FILLET5_R), align=None)
    fillet5_piece_4 = extrude(amount=FILLET5_R, mode=Mode.PRIVATE)
    fillet5_piece_4 = fillet5_piece_4 - Plane(origin=(-75, 115, -10), x_dir=(0, -0.7071067811865475, -0.7071067811865475), z_dir=(-1, 0, 0)) * Sphere(FILLET5_R, mode=Mode.PRIVATE)
    add(fillet5_piece_4, mode=Mode.SUBTRACT)
    with BuildSketch(Plane(origin=(85, 125, -10), x_dir=(0, -1, 0), z_dir=(0, 0, -1))) as fillet5_piece_5:
        with BuildLine():
            CenterArc((FILLET5_R, FILLET5_R), FILLET5_R, 180, 90)
            Line((0, FILLET5_R), (0, 0))
            Line((0, 0), (FILLET5_R, 0))
        make_face()
    extrude(amount=80, mode=Mode.SUBTRACT)
    with BuildSketch(Plane(origin=(-85, 125, -10), x_dir=(0, -1, 0), z_dir=(0, 0, -1))) as fillet5_piece_6:
        with BuildLine():
            CenterArc((FILLET5_R, -FILLET5_R), FILLET5_R, 90, 90)
            Line((0, -FILLET5_R), (0, 0))
            Line((0, 0), (FILLET5_R, 0))
        make_face()
    extrude(amount=80, mode=Mode.SUBTRACT)

    # Sketch8 → Cut-Extrude9 (cut, through all)
    with BuildSketch(Plane(origin=(24.8, 0, 0), x_dir=(0, 0, -1), z_dir=(1, 0, 0))):
        with Locations(Location((50, 176, 0), (0, 0, 25.856016698))):
            Circle(SKETCH8_R)
    extrude(amount=-CUT_EXTRUDE9_DEPTH, mode=Mode.SUBTRACT)

    # Sketch14 → Boss-Extrude8 (add)
    with BuildSketch(Plane.ZY.offset(85)):
        with Locations(Location((-20, -70, 0), (0, 0, 270))):
            Circle(SKETCH14_R)
    extrude(amount=BOSS_EXTRUDE8_DEPTH)


with BuildPart() as body_2:
    # Sketch13 → Boss-Extrude7 (new body)
    with BuildSketch(Plane(origin=(0, 0, -100), x_dir=(-1, 0, 0), z_dir=(0, 0, -1))):
        Polygon((-25, -75), (-25, -105), (25.018802851, -105), (25, -75), align=None)
    extrude(amount=BOSS_EXTRUDE7_DEPTH)

    # Fillet4
    # the kernel refuses this fillet: 10 mm, written as the material it takes off along each edge
    with BuildSketch(Plane(origin=(-25.021013242, -108.526683302, -100.1), x_dir=(0, 0, 1), z_dir=(0.0006267615930631998, 0.9999998035849335, 0))) as fillet4_piece_1:
        with BuildLine():
            CenterArc((10, 1.410673598), FILLET4_R, 180, 8.109614456)
            Line((0, 1.410673598), (0, 0))
            Line((0, 0), (0.1, 0))
        make_face()
    extrude(amount=37.053373882, mode=Mode.SUBTRACT)
    with BuildSketch(Plane(origin=(25, -71.473316005, -100.1), x_dir=(0, 0, 1), z_dir=(0, -1, 0))) as fillet4_piece_2:
        with BuildLine():
            CenterArc((10, 1.410673598), FILLET4_R, 180, 8.109614456)
            Line((0, 1.410673598), (0, 0))
            Line((0, 0), (0.1, 0))
        make_face()
    extrude(amount=37.05336799, mode=Mode.SUBTRACT)
    with BuildSketch(Plane(origin=(28.526683995, -105, -100.1), x_dir=(0, 0, 1), z_dir=(-1, 0, 0))) as fillet4_piece_3:
        with BuildLine():
            CenterArc((10, 1.410673598), FILLET4_R, 180, 8.109614456)
            Line((0, 1.410673598), (0, 0))
            Line((0, 0), (0.1, 0))
        make_face()
    extrude(amount=57.072170841, mode=Mode.SUBTRACT)


solid = Compound([part.part, body_2.part])
